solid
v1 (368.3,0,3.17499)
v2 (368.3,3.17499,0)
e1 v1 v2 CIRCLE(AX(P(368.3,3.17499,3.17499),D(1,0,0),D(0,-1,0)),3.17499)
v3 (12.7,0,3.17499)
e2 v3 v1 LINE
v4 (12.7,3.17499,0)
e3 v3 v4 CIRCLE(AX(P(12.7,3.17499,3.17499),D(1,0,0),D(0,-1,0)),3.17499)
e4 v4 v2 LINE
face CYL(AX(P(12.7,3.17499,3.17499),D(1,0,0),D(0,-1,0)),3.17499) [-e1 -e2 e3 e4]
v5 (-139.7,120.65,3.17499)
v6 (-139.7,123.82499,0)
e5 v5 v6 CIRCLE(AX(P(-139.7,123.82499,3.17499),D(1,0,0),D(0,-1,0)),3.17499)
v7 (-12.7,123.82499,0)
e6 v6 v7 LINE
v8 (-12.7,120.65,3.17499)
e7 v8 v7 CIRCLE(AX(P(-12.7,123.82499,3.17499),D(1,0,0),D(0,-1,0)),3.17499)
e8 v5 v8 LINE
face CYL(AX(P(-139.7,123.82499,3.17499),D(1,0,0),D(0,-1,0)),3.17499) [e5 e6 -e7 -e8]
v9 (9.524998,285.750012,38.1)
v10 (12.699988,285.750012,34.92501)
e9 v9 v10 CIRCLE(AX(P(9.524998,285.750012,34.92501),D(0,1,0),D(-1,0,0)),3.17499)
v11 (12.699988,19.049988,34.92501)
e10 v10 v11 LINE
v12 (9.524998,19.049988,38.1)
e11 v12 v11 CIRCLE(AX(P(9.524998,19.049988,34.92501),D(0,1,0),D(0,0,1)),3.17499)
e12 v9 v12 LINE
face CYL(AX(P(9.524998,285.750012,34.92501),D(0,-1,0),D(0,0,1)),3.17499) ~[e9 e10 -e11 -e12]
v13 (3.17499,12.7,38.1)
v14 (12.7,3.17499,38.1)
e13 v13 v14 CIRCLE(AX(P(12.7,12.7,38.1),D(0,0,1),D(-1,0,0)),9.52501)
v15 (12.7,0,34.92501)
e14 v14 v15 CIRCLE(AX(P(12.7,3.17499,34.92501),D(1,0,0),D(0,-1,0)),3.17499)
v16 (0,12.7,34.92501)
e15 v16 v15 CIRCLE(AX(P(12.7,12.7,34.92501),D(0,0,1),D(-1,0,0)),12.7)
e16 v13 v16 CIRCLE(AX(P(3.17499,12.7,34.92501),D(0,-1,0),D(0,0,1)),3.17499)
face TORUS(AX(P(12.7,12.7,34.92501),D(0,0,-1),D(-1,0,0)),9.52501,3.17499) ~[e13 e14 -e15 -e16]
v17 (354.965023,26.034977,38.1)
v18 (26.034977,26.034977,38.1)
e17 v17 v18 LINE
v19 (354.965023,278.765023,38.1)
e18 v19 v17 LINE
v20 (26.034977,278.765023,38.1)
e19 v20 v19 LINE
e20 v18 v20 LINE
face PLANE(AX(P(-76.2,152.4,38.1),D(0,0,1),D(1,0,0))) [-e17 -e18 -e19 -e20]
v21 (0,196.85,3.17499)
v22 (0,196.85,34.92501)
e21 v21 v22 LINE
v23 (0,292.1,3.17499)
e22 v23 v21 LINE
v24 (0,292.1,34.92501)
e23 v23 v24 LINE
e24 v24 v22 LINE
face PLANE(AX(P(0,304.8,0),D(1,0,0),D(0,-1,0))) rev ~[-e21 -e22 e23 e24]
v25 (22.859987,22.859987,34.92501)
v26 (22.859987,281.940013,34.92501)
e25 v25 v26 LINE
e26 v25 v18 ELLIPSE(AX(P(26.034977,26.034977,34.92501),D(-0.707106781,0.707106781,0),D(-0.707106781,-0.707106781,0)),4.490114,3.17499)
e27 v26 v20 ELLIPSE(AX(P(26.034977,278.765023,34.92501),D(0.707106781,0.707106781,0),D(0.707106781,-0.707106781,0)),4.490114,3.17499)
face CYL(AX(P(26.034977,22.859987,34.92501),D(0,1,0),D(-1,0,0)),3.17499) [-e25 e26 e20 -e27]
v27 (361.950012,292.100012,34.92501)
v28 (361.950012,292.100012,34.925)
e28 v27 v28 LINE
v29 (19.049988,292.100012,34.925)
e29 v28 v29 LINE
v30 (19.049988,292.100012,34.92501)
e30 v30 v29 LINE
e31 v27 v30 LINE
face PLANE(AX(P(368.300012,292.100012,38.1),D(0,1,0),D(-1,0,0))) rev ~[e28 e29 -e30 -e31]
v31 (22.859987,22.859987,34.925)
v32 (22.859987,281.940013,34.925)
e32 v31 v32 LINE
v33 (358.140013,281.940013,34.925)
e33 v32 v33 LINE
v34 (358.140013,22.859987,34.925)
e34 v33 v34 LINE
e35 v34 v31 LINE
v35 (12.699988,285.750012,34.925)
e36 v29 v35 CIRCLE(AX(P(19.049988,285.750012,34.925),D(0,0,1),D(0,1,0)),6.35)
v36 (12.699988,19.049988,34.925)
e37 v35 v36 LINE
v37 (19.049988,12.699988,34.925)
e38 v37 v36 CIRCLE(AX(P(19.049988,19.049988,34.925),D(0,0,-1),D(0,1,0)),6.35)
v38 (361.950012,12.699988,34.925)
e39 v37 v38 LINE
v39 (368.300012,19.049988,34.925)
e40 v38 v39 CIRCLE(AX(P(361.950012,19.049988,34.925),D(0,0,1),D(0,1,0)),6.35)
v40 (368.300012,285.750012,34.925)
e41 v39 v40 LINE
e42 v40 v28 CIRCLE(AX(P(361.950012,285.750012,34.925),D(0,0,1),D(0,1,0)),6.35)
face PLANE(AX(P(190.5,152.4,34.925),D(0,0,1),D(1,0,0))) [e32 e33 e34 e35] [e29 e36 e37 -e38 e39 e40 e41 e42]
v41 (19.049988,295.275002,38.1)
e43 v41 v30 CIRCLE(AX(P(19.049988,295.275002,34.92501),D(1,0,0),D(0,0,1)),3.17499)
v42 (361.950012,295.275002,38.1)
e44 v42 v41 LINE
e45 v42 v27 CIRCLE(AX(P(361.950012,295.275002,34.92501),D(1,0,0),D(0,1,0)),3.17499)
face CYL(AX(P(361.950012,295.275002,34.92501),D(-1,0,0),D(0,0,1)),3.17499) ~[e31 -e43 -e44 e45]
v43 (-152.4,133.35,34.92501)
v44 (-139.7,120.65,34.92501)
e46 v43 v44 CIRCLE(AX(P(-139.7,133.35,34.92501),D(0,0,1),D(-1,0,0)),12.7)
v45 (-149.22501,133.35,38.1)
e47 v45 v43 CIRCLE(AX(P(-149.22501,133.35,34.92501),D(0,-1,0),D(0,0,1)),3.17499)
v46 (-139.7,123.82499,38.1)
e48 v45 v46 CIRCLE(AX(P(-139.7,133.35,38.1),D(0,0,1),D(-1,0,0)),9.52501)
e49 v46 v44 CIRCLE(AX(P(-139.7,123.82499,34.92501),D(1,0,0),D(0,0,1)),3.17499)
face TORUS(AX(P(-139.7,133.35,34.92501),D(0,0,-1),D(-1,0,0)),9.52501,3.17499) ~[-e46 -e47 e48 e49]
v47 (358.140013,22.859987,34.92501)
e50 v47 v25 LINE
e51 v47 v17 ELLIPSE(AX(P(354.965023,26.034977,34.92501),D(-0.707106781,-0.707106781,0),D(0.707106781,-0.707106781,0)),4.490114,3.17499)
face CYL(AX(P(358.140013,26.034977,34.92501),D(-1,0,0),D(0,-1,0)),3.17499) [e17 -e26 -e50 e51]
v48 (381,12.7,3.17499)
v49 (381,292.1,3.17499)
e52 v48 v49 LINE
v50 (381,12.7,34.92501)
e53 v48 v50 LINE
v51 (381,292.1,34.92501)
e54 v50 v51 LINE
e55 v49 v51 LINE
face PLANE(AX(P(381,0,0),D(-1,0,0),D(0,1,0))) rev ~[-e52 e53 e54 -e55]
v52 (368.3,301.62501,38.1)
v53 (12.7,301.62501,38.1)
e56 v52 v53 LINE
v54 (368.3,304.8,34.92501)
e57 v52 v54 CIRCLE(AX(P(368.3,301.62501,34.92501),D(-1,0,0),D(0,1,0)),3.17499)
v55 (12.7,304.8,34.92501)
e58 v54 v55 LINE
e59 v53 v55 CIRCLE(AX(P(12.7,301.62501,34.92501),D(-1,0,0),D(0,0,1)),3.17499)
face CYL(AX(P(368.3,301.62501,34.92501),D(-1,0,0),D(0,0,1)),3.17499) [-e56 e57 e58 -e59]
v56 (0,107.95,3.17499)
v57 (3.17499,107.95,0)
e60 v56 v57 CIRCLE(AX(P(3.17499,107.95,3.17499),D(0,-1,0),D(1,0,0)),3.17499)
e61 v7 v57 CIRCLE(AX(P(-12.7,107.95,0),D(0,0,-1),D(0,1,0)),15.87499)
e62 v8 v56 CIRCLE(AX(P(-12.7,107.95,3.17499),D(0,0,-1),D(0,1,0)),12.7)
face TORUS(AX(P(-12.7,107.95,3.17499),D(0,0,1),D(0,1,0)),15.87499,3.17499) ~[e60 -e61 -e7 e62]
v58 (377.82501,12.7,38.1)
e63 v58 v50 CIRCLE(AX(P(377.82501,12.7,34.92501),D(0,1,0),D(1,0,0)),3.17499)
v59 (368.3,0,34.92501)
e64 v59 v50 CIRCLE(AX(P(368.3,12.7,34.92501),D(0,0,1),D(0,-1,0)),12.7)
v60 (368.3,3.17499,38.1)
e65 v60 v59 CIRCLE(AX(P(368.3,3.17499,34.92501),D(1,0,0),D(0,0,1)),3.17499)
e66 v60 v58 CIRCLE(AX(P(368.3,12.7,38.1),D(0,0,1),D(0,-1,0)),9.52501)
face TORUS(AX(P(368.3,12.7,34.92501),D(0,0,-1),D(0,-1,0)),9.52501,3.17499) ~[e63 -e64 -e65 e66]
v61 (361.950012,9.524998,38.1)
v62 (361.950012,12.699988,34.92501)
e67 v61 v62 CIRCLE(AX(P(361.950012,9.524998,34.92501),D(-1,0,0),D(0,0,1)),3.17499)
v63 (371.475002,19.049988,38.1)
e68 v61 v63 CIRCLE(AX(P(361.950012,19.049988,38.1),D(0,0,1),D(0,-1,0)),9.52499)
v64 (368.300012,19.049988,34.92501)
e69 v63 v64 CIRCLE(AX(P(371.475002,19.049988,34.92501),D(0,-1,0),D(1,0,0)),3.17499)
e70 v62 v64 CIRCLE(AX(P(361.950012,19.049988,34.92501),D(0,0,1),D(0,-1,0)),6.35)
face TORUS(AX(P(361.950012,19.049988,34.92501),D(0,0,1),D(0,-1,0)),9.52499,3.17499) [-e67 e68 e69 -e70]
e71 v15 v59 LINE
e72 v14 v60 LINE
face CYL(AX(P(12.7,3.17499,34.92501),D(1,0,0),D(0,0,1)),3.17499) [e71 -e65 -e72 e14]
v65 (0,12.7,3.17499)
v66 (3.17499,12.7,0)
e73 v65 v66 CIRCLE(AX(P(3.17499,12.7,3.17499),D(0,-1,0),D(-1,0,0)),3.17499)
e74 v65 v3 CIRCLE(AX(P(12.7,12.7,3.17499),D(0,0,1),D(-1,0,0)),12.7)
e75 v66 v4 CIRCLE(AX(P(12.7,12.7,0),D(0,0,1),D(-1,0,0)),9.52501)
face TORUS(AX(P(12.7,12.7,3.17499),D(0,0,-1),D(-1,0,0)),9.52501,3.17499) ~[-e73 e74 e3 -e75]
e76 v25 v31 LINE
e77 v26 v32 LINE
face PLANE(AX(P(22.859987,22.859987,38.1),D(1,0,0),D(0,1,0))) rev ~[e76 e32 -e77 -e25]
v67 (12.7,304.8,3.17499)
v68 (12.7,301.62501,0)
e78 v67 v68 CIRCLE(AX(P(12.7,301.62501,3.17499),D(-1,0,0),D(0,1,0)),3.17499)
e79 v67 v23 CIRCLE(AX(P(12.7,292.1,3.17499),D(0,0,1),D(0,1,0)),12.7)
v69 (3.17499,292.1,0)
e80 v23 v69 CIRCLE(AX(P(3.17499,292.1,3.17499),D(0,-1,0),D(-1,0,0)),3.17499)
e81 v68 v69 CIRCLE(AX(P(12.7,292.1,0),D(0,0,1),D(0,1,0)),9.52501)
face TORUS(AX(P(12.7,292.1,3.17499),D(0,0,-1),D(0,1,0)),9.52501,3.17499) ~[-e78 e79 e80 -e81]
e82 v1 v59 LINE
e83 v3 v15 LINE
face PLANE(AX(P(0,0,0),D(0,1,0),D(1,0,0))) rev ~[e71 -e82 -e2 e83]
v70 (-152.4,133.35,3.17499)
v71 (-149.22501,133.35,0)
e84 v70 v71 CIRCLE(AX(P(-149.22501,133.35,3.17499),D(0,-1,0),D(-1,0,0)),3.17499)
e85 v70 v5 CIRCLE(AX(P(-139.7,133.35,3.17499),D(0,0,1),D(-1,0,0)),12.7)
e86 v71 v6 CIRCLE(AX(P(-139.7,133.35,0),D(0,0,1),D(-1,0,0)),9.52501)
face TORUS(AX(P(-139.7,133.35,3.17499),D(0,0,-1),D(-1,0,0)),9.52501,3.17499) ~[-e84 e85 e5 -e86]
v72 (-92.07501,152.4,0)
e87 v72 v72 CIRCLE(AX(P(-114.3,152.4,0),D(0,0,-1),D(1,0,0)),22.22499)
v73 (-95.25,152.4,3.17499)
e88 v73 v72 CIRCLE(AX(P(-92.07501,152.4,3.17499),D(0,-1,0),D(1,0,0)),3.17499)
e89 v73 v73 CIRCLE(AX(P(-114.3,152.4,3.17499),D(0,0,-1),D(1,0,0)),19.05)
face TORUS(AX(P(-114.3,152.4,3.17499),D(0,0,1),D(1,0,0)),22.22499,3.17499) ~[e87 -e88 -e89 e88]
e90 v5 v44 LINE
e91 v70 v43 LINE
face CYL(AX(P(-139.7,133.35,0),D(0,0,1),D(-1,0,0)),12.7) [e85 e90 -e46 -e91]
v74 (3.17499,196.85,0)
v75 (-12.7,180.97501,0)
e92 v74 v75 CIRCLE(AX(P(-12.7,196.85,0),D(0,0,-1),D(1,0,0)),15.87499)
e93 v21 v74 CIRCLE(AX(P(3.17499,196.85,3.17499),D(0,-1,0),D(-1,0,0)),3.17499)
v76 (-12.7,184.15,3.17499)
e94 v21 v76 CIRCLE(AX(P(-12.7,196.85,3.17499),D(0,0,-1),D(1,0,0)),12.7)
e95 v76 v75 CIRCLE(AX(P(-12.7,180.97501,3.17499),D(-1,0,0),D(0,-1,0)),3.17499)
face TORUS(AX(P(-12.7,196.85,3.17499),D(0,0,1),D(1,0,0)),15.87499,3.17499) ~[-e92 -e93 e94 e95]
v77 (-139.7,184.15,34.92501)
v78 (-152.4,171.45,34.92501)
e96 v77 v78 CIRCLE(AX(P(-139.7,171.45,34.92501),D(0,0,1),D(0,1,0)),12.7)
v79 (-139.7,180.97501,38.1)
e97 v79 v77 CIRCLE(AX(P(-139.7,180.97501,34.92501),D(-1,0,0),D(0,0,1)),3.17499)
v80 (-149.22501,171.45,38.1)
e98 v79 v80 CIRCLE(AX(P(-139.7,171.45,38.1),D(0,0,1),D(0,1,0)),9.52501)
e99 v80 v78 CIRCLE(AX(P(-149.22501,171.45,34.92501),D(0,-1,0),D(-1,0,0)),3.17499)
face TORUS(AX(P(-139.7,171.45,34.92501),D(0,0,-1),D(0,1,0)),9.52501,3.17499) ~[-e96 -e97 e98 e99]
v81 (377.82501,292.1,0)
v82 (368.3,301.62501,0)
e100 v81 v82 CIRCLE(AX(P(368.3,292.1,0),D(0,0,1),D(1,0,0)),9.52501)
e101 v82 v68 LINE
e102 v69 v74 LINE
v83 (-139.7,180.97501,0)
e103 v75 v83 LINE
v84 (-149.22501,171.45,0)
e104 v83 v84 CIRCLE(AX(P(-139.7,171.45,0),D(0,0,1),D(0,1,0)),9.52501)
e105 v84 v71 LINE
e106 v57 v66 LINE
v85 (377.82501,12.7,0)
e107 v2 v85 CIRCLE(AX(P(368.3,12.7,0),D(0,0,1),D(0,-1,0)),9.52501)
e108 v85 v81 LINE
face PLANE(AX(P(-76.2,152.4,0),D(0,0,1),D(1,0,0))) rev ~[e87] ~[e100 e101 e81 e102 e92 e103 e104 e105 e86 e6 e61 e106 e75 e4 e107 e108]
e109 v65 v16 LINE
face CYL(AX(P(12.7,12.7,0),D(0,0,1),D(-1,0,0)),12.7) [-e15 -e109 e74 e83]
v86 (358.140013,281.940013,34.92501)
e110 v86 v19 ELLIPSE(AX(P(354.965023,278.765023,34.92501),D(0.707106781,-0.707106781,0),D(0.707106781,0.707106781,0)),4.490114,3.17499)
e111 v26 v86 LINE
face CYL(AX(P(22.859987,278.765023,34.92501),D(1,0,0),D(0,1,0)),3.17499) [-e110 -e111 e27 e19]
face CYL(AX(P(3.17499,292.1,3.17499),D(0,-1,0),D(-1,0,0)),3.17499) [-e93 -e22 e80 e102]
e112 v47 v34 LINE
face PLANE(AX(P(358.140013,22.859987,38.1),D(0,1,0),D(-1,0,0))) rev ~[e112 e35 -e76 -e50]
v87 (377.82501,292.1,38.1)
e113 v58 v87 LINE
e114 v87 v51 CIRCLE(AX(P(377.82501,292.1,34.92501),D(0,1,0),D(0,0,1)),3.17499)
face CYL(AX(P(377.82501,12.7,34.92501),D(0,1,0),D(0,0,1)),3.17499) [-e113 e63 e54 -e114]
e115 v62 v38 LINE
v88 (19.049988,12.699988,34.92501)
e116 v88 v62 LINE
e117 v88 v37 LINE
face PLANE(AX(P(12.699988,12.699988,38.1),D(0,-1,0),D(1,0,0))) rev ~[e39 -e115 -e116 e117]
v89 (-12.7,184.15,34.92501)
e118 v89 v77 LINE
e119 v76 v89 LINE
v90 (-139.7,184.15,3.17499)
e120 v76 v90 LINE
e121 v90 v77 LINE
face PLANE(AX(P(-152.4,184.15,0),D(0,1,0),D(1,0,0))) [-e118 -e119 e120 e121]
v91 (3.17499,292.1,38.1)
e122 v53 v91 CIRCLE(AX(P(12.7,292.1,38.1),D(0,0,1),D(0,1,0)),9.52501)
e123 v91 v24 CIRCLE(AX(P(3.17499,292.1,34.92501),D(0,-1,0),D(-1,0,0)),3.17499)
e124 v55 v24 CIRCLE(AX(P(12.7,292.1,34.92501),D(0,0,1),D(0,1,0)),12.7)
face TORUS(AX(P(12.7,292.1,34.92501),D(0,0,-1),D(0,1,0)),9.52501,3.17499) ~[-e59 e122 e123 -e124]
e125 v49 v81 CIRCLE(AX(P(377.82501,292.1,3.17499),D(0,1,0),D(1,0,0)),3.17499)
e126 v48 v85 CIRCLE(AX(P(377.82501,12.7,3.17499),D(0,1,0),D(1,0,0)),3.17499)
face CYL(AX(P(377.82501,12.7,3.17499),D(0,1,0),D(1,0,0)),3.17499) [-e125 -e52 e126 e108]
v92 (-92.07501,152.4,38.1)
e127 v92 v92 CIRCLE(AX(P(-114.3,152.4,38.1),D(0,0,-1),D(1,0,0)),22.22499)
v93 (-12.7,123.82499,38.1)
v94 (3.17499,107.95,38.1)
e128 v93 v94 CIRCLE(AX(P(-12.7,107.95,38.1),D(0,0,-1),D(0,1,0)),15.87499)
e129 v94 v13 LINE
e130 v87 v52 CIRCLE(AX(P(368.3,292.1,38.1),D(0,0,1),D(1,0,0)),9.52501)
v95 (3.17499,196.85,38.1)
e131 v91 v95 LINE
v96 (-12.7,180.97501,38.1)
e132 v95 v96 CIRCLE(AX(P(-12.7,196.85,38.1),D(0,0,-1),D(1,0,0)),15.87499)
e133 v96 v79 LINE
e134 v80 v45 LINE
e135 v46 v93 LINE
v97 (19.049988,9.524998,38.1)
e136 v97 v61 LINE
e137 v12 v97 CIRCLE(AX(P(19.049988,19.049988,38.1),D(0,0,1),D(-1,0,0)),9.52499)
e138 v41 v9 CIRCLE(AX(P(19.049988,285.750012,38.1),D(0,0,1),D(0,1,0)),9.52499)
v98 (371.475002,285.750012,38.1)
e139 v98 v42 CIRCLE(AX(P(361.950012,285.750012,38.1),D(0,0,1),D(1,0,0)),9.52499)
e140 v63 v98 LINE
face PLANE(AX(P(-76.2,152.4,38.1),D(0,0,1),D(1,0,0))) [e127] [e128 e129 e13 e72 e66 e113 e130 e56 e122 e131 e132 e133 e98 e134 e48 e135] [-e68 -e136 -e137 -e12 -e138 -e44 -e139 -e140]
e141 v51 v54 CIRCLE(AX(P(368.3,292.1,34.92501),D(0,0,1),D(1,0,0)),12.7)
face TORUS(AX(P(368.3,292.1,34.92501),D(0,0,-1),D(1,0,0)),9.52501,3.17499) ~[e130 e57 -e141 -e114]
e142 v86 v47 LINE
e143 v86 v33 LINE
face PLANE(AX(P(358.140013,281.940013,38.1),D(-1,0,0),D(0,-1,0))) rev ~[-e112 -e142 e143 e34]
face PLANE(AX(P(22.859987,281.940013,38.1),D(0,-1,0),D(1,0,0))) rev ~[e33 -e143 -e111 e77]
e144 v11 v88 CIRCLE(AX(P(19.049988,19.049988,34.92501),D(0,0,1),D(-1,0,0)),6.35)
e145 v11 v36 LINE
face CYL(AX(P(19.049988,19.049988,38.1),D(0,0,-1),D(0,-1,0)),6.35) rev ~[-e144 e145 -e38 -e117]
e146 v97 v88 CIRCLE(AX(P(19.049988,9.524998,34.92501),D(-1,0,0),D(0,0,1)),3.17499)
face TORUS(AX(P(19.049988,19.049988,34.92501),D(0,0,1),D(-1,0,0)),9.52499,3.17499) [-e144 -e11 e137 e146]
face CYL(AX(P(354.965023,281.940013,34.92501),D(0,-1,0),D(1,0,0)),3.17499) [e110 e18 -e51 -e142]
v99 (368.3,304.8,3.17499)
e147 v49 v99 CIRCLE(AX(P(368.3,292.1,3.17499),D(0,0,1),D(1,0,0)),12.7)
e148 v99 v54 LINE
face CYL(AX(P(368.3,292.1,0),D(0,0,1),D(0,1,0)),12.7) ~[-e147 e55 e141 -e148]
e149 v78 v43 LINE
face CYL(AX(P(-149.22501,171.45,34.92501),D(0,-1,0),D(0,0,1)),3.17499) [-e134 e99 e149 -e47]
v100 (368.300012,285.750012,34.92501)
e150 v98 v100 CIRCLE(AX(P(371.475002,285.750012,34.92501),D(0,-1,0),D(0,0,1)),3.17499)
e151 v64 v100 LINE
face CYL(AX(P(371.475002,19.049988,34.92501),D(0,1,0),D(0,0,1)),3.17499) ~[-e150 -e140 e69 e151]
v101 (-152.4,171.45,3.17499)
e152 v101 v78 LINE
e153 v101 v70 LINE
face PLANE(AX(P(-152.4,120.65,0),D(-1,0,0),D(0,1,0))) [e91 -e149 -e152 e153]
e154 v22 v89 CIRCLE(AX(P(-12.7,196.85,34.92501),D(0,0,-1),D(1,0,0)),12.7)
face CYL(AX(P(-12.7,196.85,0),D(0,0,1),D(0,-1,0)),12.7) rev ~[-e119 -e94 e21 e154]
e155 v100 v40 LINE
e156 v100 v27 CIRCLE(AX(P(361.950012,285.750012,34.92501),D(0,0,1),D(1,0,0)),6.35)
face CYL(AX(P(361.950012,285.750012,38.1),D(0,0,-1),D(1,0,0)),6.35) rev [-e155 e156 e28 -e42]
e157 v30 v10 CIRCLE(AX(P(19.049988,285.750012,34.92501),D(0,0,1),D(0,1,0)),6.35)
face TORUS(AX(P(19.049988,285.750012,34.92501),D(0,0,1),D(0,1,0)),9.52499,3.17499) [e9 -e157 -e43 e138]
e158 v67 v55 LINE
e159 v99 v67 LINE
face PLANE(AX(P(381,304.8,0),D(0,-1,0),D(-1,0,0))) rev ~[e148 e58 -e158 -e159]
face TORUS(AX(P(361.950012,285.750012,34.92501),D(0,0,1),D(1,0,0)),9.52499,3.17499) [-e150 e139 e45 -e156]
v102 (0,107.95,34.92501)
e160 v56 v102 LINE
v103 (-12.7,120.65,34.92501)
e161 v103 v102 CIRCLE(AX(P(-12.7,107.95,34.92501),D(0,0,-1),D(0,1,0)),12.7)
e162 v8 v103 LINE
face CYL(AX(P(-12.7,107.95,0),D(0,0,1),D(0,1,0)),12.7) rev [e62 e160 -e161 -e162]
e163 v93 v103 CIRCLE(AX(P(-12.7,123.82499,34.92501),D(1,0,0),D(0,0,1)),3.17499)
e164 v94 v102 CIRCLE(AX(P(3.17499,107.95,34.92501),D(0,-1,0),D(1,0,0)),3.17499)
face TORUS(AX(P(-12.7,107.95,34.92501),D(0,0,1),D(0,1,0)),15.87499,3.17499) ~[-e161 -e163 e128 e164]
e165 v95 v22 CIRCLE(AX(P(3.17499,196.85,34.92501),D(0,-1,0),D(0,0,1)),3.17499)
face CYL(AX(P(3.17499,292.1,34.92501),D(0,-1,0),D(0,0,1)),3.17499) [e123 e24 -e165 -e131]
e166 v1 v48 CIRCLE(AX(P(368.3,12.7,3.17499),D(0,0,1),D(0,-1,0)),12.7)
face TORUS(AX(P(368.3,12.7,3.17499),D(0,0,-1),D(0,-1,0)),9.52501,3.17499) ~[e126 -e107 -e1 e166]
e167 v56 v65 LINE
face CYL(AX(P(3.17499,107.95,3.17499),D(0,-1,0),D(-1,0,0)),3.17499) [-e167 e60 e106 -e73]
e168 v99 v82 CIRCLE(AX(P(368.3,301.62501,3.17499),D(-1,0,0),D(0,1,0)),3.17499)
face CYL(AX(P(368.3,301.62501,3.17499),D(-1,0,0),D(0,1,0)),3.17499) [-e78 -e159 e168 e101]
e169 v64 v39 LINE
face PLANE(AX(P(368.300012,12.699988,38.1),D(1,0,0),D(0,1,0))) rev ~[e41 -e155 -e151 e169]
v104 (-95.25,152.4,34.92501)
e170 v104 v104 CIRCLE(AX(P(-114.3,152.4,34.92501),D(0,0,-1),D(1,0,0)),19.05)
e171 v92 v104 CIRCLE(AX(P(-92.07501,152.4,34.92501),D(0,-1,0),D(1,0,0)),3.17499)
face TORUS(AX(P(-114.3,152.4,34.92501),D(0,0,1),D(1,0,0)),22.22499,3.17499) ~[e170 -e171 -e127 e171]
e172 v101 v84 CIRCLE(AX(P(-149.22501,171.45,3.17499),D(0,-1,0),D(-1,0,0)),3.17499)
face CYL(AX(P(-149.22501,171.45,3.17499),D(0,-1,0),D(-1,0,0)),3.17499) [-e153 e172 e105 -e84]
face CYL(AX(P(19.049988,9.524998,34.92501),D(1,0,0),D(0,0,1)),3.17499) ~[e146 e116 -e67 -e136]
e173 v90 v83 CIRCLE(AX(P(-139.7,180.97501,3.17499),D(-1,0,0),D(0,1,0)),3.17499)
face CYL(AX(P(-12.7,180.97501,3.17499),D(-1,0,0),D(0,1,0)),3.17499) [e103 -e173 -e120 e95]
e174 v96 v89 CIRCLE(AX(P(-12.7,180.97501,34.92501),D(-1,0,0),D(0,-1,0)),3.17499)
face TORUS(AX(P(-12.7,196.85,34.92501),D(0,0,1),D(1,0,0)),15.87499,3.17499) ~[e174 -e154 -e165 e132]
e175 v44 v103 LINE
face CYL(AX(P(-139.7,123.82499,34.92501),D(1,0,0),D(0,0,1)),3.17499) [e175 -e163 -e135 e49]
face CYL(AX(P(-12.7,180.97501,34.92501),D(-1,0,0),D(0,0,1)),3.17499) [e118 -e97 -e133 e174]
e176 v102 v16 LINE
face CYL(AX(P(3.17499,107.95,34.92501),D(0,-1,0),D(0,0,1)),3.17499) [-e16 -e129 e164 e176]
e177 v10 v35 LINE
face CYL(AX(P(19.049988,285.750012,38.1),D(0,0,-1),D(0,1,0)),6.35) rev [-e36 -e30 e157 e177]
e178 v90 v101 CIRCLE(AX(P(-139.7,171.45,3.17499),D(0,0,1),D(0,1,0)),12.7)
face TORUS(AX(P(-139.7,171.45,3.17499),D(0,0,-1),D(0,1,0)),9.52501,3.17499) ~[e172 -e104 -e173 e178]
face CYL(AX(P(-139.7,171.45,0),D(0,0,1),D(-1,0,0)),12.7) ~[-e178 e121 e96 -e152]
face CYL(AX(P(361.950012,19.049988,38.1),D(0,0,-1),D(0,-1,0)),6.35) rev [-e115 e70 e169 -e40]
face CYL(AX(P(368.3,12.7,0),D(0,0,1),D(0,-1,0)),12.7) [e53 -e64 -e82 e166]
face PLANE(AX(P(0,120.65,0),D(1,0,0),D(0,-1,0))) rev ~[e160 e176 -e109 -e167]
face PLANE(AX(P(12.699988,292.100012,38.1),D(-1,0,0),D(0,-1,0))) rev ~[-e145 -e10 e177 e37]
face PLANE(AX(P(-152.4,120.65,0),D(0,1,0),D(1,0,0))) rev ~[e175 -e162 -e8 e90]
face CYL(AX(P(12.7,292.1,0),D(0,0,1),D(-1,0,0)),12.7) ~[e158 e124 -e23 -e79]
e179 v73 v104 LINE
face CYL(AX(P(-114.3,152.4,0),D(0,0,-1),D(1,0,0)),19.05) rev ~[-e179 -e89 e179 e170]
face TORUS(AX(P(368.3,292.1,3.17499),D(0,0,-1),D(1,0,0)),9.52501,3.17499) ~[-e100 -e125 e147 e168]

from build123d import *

# Parameters (mm, degrees)
F0_W     = 152.4
F0_H     = 63.5
F1_DEPTH = 38.1
F2_R     = 19.05
F3_DEPTH = 38.1
F5_DEPTH = 3.175
F6_R     = 6.35
F7_R     = 12.7
F8_R     = 3.17499


# Not quite as in the source:
# - a fillet or chamfer is up to 0.001 mm smaller than in the source, because OpenCascade refuses the exact size


with BuildPart() as f1:
    # F0 (on Top) → F1 (new body)
    with BuildSketch(Plane.XY):
        with Locations((-76.2, 152.4)):
            Rectangle(F0_W, F0_H)
        Polygon((0, 120.65), (0, 0), (381, 0), (381, 304.8), (0, 304.8), (0, 184.15), align=None)
    extrude(amount=F1_DEPTH)

    # F2 (on face) → F3 (cut)
    with BuildSketch(Plane(origin=(0, 0, 0), x_dir=(1, 0, 0), z_dir=(0, 0, -1))):
        with Locations((-114.3, -152.4)):
            Circle(F2_R)
    extrude(amount=-F3_DEPTH, mode=Mode.SUBTRACT)

    # F4 (on face) → F5 (cut)
    with BuildSketch(Plane.XY.offset(38.1)):
        Polygon((12.6999876976, 120.65), (12.6999876976, 12.6999876976), (368.3000123024, 12.6999876976), (368.3000123024, 292.1000123024), (12.6999876976, 292.1000123024), (12.6999876976, 184.15), align=None)
        Polygon((22.8599868298, 120.65), (22.8599868298, 184.15), (22.8599868298, 281.9400131702), (358.1400131702, 281.9400131702), (358.1400131702, 22.8599868298), (22.8599868298, 22.8599868298), align=None, mode=Mode.SUBTRACT)
    extrude(amount=-F5_DEPTH, mode=Mode.SUBTRACT)

    # F6
    f6_edges = [f1.edges().sort_by_distance(p)[0] for p in [
        (12.699988, 292.100012, 36.5125),
        (368.300012, 292.100012, 36.5125),
        (368.300012, 12.699988, 36.5125),
        (12.699988, 12.699988, 36.5125),
    ]]
    fillet(f6_edges, radius=F6_R)

    # F7
    f7_edges = [f1.edges().sort_by_distance(p)[0] for p in [
        (0, 0, 19.05),
        (-152.4, 120.65, 19.05),
        (-152.4, 184.15, 19.05),
        (0, 304.8, 19.05),
        (381, 304.8, 19.05),
        (381, 0, 19.05),
        (0, 184.15, 19.05),
        (0, 120.65, 19.05),
    ]]
    fillet(f7_edges, radius=F7_R)

    # F8 (radius 3.175 in the source; OpenCascade refuses exactly that, so slightly less here)
    f8_edges = [f1.edges().sort_by_distance(p)[0] for p in [
        (190.5, 281.940013, 38.1),
        (358.140013, 152.4, 38.1),
        (190.5, 22.859987, 38.1),
        (22.859987, 152.4, 38.1),
        (-76.2, 120.65, 38.1),
        (-148.680256, 124.369744, 38.1),
        (-3.719744, 116.930256, 38.1),
        (-152.4, 152.4, 38.1),
        (0, 60.325, 38.1),
        (-148.680256, 180.430256, 38.1),
        (3.719744, 3.719744, 38.1),
        (-76.2, 184.15, 38.1),
        (190.5, 0, 38.1),
        (-3.719744, 187.869744, 38.1),
        (377.280256, 3.719744, 38.1),
        (0, 244.475, 38.1),
        (381, 152.4, 38.1),
        (3.719744, 301.080256, 38.1),
        (377.280256, 301.080256, 38.1),
        (190.5, 304.8, 38.1),
        (190.5, 12.699988, 38.1),
        (14.55986, 14.55986, 38.1),
        (366.44014, 14.55986, 38.1),
        (12.699988, 152.4, 38.1),
        (368.300012, 152.4, 38.1),
        (14.55986, 290.24014, 38.1),
        (366.44014, 290.24014, 38.1),
        (190.5, 292.100012, 38.1),
        (-133.35, 152.4, 38.1),
        (-76.2, 120.65, 0),
        (-148.680256, 124.369744, 0),
        (-3.719744, 116.930256, 0),
        (-152.4, 152.4, 0),
        (0, 60.325, 0),
        (-148.680256, 180.430256, 0),
        (3.719744, 3.719744, 0),
        (-76.2, 184.15, 0),
        (190.5, 0, 0),
        (-3.719744, 187.869744, 0),
        (377.280256, 3.719744, 0),
        (0, 244.475, 0),
        (381, 152.4, 0),
        (3.719744, 301.080256, 0),
        (377.280256, 301.080256, 0),
        (190.5, 304.8, 0),
        (-133.35, 152.4, 0),
    ]]
    fillet(f8_edges, radius=F8_R)


solid = f1.part
